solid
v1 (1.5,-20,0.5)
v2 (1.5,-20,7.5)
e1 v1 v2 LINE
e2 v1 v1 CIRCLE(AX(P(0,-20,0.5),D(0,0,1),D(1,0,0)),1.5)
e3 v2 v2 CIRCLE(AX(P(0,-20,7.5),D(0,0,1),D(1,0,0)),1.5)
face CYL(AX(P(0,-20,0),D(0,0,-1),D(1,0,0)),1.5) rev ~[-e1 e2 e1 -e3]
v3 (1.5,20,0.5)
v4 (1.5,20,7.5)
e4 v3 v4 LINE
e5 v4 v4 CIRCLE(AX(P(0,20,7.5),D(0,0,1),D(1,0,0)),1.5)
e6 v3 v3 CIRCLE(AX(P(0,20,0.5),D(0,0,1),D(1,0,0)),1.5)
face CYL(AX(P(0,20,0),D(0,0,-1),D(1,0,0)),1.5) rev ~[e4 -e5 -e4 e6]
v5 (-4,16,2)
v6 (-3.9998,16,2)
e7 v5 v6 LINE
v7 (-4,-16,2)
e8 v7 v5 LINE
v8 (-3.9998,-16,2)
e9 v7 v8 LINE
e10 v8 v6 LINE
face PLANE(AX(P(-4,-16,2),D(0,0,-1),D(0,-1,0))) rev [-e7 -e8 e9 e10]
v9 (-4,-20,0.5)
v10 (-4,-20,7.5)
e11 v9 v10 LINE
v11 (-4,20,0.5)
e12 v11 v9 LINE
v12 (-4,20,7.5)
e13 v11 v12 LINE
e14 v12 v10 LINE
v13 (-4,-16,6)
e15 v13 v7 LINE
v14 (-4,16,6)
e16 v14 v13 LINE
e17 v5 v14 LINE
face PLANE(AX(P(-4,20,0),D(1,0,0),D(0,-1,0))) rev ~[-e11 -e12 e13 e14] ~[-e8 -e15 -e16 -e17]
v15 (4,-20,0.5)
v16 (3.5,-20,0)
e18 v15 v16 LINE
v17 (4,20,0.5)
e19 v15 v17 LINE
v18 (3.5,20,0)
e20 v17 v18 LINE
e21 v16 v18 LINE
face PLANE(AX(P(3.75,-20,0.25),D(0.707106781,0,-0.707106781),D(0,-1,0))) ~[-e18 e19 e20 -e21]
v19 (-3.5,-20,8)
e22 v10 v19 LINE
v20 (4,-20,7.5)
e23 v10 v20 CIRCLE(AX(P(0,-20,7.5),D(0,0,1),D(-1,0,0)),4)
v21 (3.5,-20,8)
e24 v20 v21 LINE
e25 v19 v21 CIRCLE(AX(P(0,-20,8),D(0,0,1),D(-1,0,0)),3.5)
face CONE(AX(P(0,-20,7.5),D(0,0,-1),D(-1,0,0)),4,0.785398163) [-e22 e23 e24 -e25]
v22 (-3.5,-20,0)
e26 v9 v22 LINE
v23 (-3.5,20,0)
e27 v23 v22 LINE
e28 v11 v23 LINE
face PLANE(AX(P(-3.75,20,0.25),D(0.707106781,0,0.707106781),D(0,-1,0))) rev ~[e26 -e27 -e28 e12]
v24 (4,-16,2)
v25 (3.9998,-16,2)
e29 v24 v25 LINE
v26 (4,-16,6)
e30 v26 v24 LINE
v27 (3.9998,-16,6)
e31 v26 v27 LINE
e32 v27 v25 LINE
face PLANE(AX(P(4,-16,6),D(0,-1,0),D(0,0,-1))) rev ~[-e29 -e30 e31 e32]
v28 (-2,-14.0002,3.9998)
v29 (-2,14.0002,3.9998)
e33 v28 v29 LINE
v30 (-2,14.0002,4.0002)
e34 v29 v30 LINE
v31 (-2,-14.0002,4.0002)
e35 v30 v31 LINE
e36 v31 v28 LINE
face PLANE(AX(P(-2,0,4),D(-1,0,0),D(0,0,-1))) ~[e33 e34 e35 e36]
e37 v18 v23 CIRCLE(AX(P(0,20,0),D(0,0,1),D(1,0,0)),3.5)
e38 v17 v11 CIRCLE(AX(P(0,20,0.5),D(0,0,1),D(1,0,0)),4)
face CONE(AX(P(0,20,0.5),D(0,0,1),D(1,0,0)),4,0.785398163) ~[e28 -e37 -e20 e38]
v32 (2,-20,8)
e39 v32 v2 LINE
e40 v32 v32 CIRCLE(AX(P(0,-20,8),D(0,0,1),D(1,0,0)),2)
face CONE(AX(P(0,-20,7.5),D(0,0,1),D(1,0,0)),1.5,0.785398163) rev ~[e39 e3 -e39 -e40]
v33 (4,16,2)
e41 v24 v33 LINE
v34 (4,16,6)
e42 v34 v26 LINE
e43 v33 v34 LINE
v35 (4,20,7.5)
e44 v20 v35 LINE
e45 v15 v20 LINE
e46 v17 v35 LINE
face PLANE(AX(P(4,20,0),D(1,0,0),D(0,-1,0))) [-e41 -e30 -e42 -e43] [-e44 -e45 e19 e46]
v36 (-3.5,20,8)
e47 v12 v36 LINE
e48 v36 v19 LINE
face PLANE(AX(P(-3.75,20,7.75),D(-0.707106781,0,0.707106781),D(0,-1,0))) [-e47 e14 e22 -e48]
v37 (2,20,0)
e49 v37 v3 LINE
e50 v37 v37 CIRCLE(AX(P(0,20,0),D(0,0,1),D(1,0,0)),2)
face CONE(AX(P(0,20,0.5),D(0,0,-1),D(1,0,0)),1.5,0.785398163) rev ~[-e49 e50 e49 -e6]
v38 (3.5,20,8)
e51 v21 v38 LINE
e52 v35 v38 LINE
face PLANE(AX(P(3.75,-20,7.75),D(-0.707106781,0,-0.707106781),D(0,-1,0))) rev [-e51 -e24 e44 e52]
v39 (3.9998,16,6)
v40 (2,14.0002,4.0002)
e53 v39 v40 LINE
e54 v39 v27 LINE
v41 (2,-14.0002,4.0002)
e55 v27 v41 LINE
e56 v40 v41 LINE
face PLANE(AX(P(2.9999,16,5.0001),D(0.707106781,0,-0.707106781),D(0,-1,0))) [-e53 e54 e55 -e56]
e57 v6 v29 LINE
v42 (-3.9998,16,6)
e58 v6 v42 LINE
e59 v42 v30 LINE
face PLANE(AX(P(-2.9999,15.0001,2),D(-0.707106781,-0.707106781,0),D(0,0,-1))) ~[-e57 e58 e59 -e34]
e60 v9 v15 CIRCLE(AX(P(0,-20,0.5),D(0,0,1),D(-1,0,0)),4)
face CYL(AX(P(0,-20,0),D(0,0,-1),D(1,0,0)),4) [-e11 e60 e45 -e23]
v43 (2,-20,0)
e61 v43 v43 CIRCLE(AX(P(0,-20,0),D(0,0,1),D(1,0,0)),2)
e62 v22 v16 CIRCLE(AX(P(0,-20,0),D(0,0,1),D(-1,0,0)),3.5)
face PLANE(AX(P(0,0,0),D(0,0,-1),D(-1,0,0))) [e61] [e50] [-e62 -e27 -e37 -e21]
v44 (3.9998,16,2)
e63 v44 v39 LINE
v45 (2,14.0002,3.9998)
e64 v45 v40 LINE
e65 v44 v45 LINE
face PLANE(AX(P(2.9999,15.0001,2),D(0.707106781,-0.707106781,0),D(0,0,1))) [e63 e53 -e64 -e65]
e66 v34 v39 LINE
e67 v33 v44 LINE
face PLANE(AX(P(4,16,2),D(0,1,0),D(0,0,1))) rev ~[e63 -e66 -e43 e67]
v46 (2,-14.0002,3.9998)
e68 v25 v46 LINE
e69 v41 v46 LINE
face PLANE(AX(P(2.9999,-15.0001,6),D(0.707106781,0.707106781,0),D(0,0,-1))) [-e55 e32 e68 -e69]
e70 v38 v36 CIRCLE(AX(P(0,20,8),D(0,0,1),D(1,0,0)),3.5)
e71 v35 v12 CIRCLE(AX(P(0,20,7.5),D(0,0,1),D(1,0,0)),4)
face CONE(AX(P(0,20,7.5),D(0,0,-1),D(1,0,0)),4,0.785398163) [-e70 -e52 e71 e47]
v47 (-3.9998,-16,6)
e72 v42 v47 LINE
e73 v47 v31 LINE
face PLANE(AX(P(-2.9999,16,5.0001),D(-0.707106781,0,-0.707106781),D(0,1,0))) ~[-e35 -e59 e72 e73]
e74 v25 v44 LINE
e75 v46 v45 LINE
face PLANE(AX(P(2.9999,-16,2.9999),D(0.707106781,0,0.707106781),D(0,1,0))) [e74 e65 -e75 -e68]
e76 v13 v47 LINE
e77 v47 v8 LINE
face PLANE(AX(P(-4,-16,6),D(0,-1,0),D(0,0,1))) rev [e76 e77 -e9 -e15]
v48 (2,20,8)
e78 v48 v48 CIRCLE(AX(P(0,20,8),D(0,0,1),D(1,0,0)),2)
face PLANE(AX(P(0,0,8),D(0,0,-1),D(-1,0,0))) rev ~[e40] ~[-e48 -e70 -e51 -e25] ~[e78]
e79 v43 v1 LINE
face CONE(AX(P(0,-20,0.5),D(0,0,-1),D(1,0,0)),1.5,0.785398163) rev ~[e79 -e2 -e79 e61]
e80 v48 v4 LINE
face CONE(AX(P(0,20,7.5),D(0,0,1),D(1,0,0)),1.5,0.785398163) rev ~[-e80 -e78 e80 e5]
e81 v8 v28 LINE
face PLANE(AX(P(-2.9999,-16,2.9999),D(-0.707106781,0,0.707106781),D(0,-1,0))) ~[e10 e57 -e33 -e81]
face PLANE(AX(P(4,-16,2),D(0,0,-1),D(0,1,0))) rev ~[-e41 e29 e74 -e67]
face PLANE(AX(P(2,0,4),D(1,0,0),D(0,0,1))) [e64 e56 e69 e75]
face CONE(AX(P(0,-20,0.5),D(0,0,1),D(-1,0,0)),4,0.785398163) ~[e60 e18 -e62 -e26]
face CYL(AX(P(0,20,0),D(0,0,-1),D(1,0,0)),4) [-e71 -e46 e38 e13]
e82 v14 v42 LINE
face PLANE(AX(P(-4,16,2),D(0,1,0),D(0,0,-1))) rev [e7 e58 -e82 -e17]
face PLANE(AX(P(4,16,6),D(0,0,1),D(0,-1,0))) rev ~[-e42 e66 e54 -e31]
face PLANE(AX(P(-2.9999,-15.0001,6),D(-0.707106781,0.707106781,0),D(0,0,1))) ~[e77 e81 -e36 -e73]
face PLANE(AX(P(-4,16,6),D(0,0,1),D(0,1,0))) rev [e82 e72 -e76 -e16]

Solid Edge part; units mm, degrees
sketch "Sketch1" plane through (0, 0, 0) normal (0, 0, 1) x (1, 0, 0)
  line L0 (4, 20) -> (4, -20)
  line L1 (-4, 20) -> (-4, -20)
  arc A0 (4, -20) -> (-4, -20) centre (0, -20) cw
  arc A1 (-4, 20) -> (4, 20) centre (0, 20) cw
  circle A2 centre (0, -20) radius 1.5
  circle A3 centre (0, 20) radius 1.5
extrude "Protrusion1" add sketch "Sketch1" along normal blind 8
sketch "Sketch2" plane through (4, 0, 4) normal (1, 0, 0) x (0, 1, 0)
  line L0 (16, 2) -> (-16, 2)
  line L1 (-16, 2) -> (-16, -2)
  line L2 (-16, -2) -> (16, -2)
  line L3 (16, -2) -> (16, 2)
  dimension "D1" = 2
  dimension "D2" = 2
  dimension "D3" = 4
  dimension "D4" = 4
extrude "VaciadoExtruido_1" cut sketch "Sketch2" against normal blind 2
chamfer "Chaflán_1" distance 2 angle 45 4 edges at (2, 0, 2) (2, 16, 4) (2, 0, 6) (2, -16, 4)
mirror "Mirror1" about plane through (0, 0, 0) normal (1, 0, 0) of "VaciadoExtruido_1"
chamfer "Chamfer1" distance 2 angle 45 4 edges at (-2, 0, 2) (-2, 16, 4) (-2, 0, 6) (-2, -16, 4)
chamfer "Chaflán_3" distance 0.5 angle 45 10 edges at (-4, 0, 8) (0, 24, 8) (4, 0, 8) (-4, 0, 0) (0, 24, 0) (4, 0, 0) (-1.5, -20, 8) (-1.5, 20, 8) (-1.5, 20, 0) (-1.5, -20, 0)
